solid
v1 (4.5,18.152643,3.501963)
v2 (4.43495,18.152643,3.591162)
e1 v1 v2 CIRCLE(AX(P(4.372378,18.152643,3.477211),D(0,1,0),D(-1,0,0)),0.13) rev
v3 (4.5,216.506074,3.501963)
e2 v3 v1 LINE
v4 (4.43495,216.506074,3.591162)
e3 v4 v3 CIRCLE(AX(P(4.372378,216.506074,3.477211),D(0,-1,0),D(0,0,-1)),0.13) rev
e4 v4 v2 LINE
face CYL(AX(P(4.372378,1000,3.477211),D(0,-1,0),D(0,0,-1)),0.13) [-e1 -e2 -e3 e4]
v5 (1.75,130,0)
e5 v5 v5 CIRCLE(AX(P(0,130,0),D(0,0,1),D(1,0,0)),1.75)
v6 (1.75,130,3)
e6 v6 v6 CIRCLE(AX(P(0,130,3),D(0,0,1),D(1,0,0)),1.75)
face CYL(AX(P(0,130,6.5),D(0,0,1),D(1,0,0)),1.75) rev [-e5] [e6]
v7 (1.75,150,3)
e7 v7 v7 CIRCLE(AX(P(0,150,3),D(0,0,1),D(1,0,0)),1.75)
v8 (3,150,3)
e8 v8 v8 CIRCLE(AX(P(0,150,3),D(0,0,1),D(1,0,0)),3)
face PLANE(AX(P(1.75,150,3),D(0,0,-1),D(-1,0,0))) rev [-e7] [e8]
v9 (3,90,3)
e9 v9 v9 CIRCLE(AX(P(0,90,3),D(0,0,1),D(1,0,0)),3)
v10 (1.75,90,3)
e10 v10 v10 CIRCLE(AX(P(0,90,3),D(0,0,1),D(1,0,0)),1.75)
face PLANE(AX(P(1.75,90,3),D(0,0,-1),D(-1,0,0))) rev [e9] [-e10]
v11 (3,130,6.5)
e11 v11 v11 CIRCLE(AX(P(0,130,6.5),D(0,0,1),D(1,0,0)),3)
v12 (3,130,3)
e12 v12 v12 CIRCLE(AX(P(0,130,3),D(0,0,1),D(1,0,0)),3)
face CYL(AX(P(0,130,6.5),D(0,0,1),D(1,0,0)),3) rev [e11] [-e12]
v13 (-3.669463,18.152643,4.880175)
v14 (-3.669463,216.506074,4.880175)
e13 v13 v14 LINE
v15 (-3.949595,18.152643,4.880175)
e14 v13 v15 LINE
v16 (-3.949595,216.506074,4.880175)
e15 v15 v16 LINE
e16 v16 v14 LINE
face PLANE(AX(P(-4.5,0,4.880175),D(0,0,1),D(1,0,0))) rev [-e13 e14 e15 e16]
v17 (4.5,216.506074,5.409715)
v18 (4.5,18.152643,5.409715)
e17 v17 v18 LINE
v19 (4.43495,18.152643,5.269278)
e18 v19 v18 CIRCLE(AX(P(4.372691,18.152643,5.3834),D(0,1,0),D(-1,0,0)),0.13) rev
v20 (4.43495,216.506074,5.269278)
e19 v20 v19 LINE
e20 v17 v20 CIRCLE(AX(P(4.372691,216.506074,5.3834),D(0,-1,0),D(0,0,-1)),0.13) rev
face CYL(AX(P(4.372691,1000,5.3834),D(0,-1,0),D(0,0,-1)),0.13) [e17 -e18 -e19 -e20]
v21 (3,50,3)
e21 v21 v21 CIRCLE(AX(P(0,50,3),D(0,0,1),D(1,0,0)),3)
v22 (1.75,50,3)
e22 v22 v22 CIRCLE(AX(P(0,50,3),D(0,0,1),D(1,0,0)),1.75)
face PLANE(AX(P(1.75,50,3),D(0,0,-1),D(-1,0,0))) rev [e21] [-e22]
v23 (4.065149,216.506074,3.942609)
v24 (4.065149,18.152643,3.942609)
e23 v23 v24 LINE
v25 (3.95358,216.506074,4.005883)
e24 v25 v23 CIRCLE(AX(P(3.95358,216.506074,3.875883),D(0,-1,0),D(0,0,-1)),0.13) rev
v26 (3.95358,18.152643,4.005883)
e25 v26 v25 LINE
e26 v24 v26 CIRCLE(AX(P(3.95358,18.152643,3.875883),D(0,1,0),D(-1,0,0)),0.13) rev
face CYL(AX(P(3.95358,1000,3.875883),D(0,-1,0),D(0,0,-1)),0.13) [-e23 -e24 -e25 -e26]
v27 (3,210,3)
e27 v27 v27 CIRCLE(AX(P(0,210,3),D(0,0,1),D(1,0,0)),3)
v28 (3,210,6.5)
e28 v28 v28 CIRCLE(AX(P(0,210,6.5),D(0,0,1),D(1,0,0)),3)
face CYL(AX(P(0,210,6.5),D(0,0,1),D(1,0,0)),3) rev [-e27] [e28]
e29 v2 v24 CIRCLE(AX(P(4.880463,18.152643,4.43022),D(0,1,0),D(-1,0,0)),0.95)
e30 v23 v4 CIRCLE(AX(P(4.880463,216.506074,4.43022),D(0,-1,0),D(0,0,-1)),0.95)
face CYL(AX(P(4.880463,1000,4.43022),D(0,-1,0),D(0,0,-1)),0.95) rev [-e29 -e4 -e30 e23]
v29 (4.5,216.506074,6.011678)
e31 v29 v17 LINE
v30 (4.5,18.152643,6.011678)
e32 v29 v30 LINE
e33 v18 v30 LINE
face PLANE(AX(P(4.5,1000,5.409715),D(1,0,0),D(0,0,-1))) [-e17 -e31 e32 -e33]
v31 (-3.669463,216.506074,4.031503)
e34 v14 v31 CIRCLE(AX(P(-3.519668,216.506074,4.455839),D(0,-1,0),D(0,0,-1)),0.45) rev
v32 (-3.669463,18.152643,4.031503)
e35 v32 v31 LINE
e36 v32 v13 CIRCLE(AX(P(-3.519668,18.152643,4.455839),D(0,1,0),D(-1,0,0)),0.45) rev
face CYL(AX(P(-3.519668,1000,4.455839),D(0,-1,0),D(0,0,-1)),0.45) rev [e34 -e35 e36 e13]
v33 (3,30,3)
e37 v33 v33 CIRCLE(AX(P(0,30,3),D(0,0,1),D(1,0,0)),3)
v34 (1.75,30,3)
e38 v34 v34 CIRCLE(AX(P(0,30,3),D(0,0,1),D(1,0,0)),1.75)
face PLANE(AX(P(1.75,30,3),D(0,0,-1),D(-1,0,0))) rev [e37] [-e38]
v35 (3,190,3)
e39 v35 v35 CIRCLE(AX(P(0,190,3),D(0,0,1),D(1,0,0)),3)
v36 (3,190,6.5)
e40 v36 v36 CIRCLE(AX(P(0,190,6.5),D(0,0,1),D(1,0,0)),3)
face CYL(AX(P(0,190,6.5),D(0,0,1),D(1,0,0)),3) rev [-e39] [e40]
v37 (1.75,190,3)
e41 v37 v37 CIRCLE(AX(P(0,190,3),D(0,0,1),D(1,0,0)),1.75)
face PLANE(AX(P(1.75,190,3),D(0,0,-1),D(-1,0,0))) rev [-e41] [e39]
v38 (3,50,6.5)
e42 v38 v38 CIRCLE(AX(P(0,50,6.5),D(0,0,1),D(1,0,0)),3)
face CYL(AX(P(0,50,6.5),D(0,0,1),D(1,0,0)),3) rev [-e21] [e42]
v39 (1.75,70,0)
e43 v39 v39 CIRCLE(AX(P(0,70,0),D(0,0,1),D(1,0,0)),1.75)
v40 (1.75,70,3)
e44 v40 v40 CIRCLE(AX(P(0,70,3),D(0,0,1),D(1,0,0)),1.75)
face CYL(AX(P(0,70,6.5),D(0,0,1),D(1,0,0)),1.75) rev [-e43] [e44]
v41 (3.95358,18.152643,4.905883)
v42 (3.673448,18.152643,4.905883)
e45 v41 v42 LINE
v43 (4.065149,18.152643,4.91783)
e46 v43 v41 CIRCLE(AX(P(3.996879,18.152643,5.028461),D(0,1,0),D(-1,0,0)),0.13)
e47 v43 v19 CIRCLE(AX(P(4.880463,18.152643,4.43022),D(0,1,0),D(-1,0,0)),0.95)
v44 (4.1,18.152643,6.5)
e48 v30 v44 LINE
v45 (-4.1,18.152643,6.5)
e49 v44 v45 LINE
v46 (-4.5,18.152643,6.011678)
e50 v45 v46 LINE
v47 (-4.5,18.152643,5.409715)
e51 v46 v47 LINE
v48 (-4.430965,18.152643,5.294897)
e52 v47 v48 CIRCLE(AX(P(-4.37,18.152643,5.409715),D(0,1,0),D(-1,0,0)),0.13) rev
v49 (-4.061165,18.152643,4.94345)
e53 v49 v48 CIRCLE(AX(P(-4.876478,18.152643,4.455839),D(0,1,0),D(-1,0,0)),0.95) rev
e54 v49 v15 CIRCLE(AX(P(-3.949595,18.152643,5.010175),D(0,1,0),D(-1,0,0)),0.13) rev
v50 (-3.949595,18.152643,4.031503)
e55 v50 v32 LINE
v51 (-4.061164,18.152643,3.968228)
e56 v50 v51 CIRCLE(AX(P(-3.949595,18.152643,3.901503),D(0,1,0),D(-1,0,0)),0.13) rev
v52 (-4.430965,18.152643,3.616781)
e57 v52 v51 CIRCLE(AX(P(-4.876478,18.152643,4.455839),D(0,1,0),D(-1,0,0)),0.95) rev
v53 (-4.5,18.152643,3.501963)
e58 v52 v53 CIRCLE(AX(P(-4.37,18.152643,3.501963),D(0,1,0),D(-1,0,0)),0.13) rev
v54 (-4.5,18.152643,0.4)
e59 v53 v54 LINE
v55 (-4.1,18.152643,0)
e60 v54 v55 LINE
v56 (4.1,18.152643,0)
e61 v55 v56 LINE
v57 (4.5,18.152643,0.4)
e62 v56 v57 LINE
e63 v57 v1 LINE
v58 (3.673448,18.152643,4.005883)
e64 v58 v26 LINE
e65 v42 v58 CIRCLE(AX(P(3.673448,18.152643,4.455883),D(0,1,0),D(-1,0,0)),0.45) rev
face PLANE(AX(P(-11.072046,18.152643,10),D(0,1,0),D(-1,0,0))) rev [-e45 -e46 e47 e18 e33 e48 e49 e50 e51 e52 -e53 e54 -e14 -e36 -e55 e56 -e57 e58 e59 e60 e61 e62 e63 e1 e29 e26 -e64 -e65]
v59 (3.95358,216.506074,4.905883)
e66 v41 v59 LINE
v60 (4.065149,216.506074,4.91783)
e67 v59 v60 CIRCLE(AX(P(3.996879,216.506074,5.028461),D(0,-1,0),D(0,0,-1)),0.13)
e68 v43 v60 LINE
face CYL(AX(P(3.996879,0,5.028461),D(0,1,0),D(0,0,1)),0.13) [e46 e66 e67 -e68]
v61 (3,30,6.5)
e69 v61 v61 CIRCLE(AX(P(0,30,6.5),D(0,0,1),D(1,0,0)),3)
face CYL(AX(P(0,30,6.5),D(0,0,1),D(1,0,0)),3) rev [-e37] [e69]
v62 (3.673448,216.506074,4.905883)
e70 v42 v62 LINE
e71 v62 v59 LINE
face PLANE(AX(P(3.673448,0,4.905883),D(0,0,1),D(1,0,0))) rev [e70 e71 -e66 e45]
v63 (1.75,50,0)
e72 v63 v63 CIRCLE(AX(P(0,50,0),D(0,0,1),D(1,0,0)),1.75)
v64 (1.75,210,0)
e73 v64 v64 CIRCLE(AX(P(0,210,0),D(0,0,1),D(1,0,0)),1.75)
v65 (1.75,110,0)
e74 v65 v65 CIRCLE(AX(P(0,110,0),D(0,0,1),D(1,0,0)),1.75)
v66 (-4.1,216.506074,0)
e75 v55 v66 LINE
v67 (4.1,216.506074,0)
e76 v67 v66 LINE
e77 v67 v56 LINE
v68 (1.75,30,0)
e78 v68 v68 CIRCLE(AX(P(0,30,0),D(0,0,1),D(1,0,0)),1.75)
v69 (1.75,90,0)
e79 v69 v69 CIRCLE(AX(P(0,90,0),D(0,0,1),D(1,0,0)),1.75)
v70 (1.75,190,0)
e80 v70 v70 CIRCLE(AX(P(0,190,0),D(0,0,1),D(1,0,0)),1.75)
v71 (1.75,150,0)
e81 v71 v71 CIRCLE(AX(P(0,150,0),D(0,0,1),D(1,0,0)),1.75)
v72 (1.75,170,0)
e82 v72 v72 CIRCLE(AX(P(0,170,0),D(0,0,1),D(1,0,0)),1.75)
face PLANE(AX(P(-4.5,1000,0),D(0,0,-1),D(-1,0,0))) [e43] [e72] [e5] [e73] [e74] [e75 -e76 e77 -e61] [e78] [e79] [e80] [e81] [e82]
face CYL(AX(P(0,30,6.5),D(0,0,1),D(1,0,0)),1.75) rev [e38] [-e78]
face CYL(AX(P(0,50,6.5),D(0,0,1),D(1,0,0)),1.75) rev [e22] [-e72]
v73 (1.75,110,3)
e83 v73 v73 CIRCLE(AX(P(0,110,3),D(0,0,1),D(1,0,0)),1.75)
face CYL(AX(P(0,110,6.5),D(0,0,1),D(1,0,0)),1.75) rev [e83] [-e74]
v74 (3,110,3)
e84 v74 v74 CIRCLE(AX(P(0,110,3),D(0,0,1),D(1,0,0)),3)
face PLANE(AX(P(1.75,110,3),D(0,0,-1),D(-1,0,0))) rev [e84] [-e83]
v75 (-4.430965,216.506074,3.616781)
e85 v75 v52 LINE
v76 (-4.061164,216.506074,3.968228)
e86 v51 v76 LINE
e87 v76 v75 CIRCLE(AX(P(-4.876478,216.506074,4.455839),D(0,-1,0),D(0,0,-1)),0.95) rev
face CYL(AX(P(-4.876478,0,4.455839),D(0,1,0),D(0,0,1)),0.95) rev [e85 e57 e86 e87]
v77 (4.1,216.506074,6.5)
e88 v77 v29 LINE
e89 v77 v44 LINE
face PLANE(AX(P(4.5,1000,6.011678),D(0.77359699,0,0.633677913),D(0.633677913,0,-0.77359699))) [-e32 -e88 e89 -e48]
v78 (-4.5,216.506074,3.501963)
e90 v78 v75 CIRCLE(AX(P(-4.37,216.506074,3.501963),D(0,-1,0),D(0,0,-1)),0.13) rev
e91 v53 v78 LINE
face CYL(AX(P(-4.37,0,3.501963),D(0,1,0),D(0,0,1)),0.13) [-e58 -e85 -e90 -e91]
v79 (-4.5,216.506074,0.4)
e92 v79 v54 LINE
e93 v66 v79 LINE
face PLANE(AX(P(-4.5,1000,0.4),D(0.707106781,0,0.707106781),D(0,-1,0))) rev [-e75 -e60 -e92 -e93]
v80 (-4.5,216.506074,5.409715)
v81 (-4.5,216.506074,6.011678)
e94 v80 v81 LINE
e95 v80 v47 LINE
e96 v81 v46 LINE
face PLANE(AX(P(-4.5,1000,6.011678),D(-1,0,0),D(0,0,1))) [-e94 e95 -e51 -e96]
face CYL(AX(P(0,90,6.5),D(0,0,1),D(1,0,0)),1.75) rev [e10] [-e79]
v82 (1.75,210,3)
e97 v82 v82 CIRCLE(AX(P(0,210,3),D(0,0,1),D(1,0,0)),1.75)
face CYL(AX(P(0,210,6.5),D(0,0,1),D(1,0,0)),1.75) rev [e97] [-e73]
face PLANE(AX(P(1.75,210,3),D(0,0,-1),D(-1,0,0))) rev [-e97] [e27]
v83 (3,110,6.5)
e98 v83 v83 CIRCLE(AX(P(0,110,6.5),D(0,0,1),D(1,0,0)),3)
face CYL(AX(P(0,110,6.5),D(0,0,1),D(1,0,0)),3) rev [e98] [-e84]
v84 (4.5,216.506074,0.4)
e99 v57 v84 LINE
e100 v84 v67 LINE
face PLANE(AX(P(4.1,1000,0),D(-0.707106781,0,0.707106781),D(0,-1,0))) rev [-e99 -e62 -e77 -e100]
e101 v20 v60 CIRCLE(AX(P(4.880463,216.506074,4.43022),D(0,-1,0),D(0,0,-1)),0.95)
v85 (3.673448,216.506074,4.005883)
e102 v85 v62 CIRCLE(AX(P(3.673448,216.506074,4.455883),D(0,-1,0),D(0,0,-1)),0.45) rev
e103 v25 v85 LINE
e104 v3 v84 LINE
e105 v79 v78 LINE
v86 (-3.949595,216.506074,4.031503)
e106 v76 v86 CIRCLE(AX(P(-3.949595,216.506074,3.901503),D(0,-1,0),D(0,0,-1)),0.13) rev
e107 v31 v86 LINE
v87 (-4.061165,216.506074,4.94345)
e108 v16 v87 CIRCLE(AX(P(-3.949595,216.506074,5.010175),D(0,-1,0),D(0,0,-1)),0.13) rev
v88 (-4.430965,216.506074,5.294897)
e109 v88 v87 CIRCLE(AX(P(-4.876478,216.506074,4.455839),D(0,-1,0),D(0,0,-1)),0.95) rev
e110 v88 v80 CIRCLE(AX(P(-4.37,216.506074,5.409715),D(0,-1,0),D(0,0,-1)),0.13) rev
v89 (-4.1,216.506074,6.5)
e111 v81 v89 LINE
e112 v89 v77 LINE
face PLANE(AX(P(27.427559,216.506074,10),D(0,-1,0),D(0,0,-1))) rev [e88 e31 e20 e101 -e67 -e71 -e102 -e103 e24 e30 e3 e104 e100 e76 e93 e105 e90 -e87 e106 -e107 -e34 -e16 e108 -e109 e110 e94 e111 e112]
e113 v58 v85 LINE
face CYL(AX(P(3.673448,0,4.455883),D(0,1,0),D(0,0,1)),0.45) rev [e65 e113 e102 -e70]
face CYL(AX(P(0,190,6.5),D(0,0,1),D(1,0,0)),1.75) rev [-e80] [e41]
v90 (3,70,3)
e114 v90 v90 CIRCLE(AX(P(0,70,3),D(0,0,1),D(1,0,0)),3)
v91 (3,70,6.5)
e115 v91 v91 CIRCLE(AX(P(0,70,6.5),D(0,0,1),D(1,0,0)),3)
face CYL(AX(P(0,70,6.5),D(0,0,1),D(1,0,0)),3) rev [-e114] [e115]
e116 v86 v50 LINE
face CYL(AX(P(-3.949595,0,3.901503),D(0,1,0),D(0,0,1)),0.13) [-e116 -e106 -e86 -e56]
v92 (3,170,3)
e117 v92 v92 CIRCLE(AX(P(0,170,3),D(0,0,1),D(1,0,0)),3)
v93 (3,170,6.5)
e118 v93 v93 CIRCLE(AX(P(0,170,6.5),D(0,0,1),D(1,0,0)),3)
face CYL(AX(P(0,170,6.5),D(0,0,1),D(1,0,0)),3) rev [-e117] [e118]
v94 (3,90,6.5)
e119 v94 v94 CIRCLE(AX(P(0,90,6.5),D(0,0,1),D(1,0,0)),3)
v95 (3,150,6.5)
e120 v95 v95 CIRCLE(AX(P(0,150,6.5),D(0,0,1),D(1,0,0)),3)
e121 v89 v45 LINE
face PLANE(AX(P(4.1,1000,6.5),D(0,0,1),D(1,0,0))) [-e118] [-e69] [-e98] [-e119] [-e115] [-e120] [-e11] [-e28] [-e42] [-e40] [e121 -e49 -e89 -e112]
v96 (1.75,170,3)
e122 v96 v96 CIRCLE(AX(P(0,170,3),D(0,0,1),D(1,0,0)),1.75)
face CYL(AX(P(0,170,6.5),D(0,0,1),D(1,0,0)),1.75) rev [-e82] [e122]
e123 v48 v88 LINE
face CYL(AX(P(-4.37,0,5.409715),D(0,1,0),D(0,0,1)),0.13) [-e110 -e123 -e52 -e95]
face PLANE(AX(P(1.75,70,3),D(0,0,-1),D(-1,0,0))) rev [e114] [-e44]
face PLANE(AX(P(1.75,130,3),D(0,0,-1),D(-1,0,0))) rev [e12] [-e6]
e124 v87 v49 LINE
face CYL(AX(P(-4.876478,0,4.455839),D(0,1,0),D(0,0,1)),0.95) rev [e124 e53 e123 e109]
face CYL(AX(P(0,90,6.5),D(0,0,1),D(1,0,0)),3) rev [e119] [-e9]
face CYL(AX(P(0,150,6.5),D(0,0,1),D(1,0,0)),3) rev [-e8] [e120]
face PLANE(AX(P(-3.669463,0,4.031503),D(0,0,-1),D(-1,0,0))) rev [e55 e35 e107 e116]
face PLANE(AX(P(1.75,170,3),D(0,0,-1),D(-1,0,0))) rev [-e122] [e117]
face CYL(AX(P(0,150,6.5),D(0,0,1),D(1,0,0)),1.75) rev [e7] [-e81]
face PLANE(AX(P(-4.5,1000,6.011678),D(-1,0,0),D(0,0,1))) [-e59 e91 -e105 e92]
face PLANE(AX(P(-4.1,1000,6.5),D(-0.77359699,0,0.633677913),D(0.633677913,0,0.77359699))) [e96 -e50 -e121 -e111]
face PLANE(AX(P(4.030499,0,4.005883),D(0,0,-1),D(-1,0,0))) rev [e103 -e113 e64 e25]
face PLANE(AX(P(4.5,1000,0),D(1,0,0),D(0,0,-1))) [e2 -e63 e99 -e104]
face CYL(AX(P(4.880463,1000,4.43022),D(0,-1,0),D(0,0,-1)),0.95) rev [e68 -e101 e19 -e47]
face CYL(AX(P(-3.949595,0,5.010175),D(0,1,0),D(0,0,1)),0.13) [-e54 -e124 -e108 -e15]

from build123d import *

# Parameters (mm, degrees)
RESSALTO_EXTRUS_O1_DEPTH                             = 1000
CORTE_EXTRUS_O1_START                                = -1000
CORTE_EXTRUS_O1_DEPTH                                = 1000
CORTE_EXTRUS_O2_DEPTH                                = 1001.031261626
CORTE_EXTRUS_O3_DEPTH                                = 1001.031261626
CORTE_EXTRUS_O4_DEPTH                                = 1001.031261626
CORTE_EXTRUS_O5_DEPTH                                = 0.002166667
CORTE_EXTRUS_O6_DEPTH                                = 0.002166667
CORTE_EXTRUS_O7_DEPTH                                = 0.002166667
CORTE_EXTRUS_O8_DEPTH                                = 0.002166667
INCLINA_O1_ANGLE                                     = 45.1469538
ESBO_O10_W                                           = 0.450000001
ESBO_O10_H                                           = 1000
REBAIXO_PARA_PARAFUSO_DE_M_QUINA_DE_CABE_D           = 3.5
REBAIXO_PARA_PARAFUSO_DE_M_QUINA_DE_CABE_CBORE_D     = 6
REBAIXO_PARA_PARAFUSO_DE_M_QUINA_DE_CABE_CBORE_DEPTH = 3.50000002
CHANFRO1_SIZE                                        = 0.062563219
CHANFRO1_SIZE2                                       = 0.062205617
CHANFRO3_START                                       = -3.730761794
CHANFRO3_DEPTH                                       = 0.399013115
CHANFRO4_SIZE                                        = 0.4
FILETE1_R                                            = 0.130000023
SKETCH1_W                                            = 36.072768502
SKETCH1_H                                            = 801.847062841
SKETCH1_W_2                                          = 21.632087489
SKETCH1_H_2                                          = 62.411000867
CUT_EXTRUDE1_DEPTH                                   = 10


with BuildPart() as part:
    # Esboço1 → Ressalto-extrusão1 (new body)
    with BuildSketch(Plane.XZ):
        with BuildLine():
            Line((4.5, 5.4097155), (4.5, 6.01167813))
            Line((4.5, 6.01167813), (4.1, 6.50000002))
            Line((4.1, 6.50000002), (-4.1, 6.50000002))
            Line((-4.1, 6.50000002), (-4.5, 6.01167813))
            Line((-4.5, 6.01167813), (-4.5, 2e-08))
            Line((-4.5, 2e-08), (4.5, 2e-08))
            Line((4.5, 2e-08), (4.5, 3.50196265))
            ThreePointArc((4.5, 3.50196265), (4.477413879, 3.553810372), (4.43494978, 3.59116167))
            ThreePointArc((4.43494978, 3.59116167), (3.930462682, 4.43021964), (4.43494978, 5.26927761))
            ThreePointArc((4.43494978, 5.26927761), (4.490651601, 5.328761203), (4.5, 5.4097155))
        make_face()
    extrude(amount=-RESSALTO_EXTRUS_O1_DEPTH)

    # Esboço2 → Corte-extrusão1 (cut)
    with BuildSketch(Plane(origin=(0, 1000, 0), x_dir=(-1, 0, 0), z_dir=(0, 1, 0)).offset(CORTE_EXTRUS_O1_START)):
        with BuildLine():
            Line((-4.030498711, 4.00588336), (-3.673447948, 4.00588336))
            ThreePointArc((-3.673447948, 4.00588336), (-3.223447946, 4.455883362), (-3.673447948, 4.905883363))
            Line((-3.673447948, 4.905883363), (-3.953580008, 4.905883363))
            ThreePointArc((-3.953580008, 4.905883363), (-4.010719931, 4.899199784), (-4.065149208, 4.917830263))
            ThreePointArc((-4.065149208, 4.917830263), (-3.93114763, 4.466290066), (-4.030498711, 4.00588336))
        make_face()
    extrude(amount=CORTE_EXTRUS_O1_DEPTH, mode=Mode.SUBTRACT)

    # Esboço3 → Corte-extrusão2 (cut, through all)
    with BuildSketch(Plane(origin=(0, 1000, 0), x_dir=(-1, 0, 0), z_dir=(0, 1, 0))):
        with BuildLine():
            Line((4.5, 4.03150278), (4.5, 4.88017535))
            Line((4.5, 4.88017535), (3.66946318, 4.88017535))
            ThreePointArc((3.66946318, 4.88017535), (3.969667593, 4.455839065), (3.66946318, 4.03150278))
            Line((3.66946318, 4.03150278), (4.5, 4.03150278))
        make_face()
    extrude(amount=-CORTE_EXTRUS_O2_DEPTH, mode=Mode.SUBTRACT)

    # Esboço4 → Corte-extrusão3 (cut, through all)
    with BuildSketch(Plane(origin=(0, 1000, 0), x_dir=(-1, 0, 0), z_dir=(0, 1, 0))):
        with BuildLine():
            Line((4.026513974, 4.88017535), (4.5, 4.88017535))
            Line((4.5, 4.88017535), (4.5, 5.328056964))
            ThreePointArc((4.5, 5.328056964), (4.223646078, 5.145991535), (4.026513974, 4.88017535))
        make_face()
    extrude(amount=-CORTE_EXTRUS_O3_DEPTH, mode=Mode.SUBTRACT)

    # Esboço5 → Corte-extrusão4 (cut, through all)
    with BuildSketch(Plane(origin=(0, 1000, 0), x_dir=(-1, 0, 0), z_dir=(0, 1, 0))):
        with BuildLine():
            Line((4.5, 3.583620931), (4.5, 4.03150278))
            Line((4.5, 4.03150278), (4.026513856, 4.03150278))
            ThreePointArc((4.026513856, 4.03150278), (4.223645982, 3.76568645), (4.5, 3.583620931))
        make_face()
    extrude(amount=-CORTE_EXTRUS_O4_DEPTH, mode=Mode.SUBTRACT)

    # Esboço6 → Corte-extrusão5 (cut)
    with BuildSketch(Plane(origin=(0, 1000, 0), x_dir=(-1, 0, 0), z_dir=(0, 1, 0))):
        Polygon((0.891369267, 3.403698133), (0.714701433, 3.168235633), (0.2187042, 2.61105), (1.0945792, 2.61105), (1.0945792, 2.695983333), (0.398689633, 2.695983333), (0.794326433, 3.149466667), (0.9743123, 3.3891), (1.067110588, 3.573407857), (0.95413722, 3.802321701), (0.7876908, 3.88505), (0.54301, 3.88505), (0.375434678, 3.803592619), (0.295011167, 3.6384023), (0.295011167, 3.562), (0.3812718, 3.562), (0.3812718, 3.631766667), (0.437672733, 3.743620833), (0.549645633, 3.800116667), (0.7802262, 3.800116667), (0.893028067, 3.743810633), (0.976240026, 3.576039029), align=None)
    extrude(amount=-CORTE_EXTRUS_O5_DEPTH, mode=Mode.SUBTRACT)

    # Esboço7 → Corte-extrusão6 (cut)
    with BuildSketch(Plane.XZ):
        Polygon((-0.214632167, 3.88505), (-0.953983333, 3.88505), (-0.953983333, 2.61105), (-0.214632167, 2.61105), (-0.214632167, 2.695983333), (-0.86905, 2.695983333), (-0.86905, 3.205583333), (-0.5123963, 3.205583333), (-0.5123963, 3.290516667), (-0.86905, 3.290516667), (-0.86905, 3.800116667), (-0.214632167, 3.800116667), align=None)
    extrude(amount=-CORTE_EXTRUS_O6_DEPTH, mode=Mode.SUBTRACT)

    # Esboço8 → Corte-extrusão7 (cut)
    with BuildSketch(Plane(origin=(0, 1000, 0), x_dir=(-1, 0, 0), z_dir=(0, 1, 0))):
        Polygon((-0.214632167, 3.88505), (-0.953983333, 3.88505), (-0.953983333, 2.61105), (-0.214632167, 2.61105), (-0.214632167, 2.695983333), (-0.86905, 2.695983333), (-0.86905, 3.205583333), (-0.5123963, 3.205583333), (-0.5123963, 3.290516667), (-0.86905, 3.290516667), (-0.86905, 3.800116667), (-0.214632167, 3.800116667), align=None)
    extrude(amount=-CORTE_EXTRUS_O7_DEPTH, mode=Mode.SUBTRACT)

    # Esboço9 → Corte-extrusão8 (cut)
    with BuildSketch(Plane.XZ):
        Polygon((0.510057167, 3.620830633), (0.6071, 3.718655633), (0.6071, 2.609403333), (0.692033333, 2.609403333), (0.692033333, 3.883403333), (0.6741176, 3.883403333), (0.6741176, 3.795069794), (0.3690544, 3.640736667), (0.3690544, 3.551253333), align=None)
    extrude(amount=-CORTE_EXTRUS_O8_DEPTH, mode=Mode.SUBTRACT)

    # Inclinação1
    inclina_o1_faces = [part.faces().sort_by_distance(p)[0] for p in [
        (0.6741176, 0.001083333, 3.839236564),
    ]]
    draft(inclina_o1_faces, Plane(origin=(0.692033333, 0.002166667, 3.883403333), x_dir=(-1, 0, 0), z_dir=(0, 0, -1)), INCLINA_O1_ANGLE)

    # Esboço10 → Corte-Revolução1 (revolve, cut)
    with BuildSketch(Plane.XY.offset(4.455839065)):
        with Locations((-3.294667591, 500)):
            Rectangle(ESBO_O10_W, ESBO_O10_H)
    revolve(axis=Axis((-3.519667591, 1000, 4.455839065), (0, -1, 0)), mode=Mode.SUBTRACT)

    # Rebaixo para parafuso de máquina de cabeça sextavada de M31 (through all)
    with Locations(Plane.XY.offset(6.50000002)):
        with Locations((0, 990), (0, 970), (0, 950), (0, 930), (0, 910), (0, 890), (0, 870), (0, 850), (0, 830), (0, 810), (0, 790), (0, 770), (0, 750), (0, 730), (0, 710), (0, 690), (0, 670), (0, 650), (0, 630), (0, 610), (0, 590), (0, 570), (0, 550), (0, 530), (0, 510), (0, 490), (0, 470), (0, 450), (0, 430), (0, 410), (0, 390), (0, 370), (0, 350), (0, 330), (0, 310), (0, 290), (0, 270), (0, 250), (0, 230), (0, 210), (0, 190), (0, 170), (0, 150), (0, 130), (0, 110), (0, 90), (0, 70), (0, 50), (0, 30), (0, 10)):
            CounterBoreHole(REBAIXO_PARA_PARAFUSO_DE_M_QUINA_DE_CABE_D / 2, REBAIXO_PARA_PARAFUSO_DE_M_QUINA_DE_CABE_CBORE_D / 2, REBAIXO_PARA_PARAFUSO_DE_M_QUINA_DE_CABE_CBORE_DEPTH)

    # Chanfro1
    chanfro1_edges = [part.edges().sort_by_distance(p)[0] for p in [
        (-0.976240026, 999.998916667, 3.576039029),
    ]]
    chanfro1_side = [part.faces().sort_by_distance(p)[0] for p in [
        (-0.933804646, 999.998916667, 3.489868581),
    ]]
    chamfer(chanfro1_edges, length=CHANFRO1_SIZE, length2=CHANFRO1_SIZE2, reference=chanfro1_side[0])

    # Chanfro3: read off the stored shape, not the designer's step
    # Chanfro3 outline → Chanfro3 (add)
    with BuildSketch(Plane(origin=(0, 0, 0), x_dir=(0.8991051825477068, 0, 0.43773264753254887), z_dir=(0.4377326475325489, 0, -0.8991051825477069)).offset(CHANFRO3_START)):
        Polygon((1.327401403, -999.997833333), (1.31122788, -999.997833333), (1.311999664, -1000), (1.327401403, -1000), align=None)
    extrude(amount=CHANFRO3_DEPTH)

    # Chanfro4
    chanfro4_edges = [part.edges().sort_by_distance(p)[0] for p in [
        (4.5, 500, 2e-08),
        (-4.5, 500, 2e-08),
    ]]
    chamfer(chanfro4_edges, length=CHANFRO4_SIZE)

    # Filete1
    filete1_edges = [part.edges().sort_by_distance(p)[0] for p in [
        (4.030498711, 500, 4.00588336),
        (-4.026513974, 500, 4.88017535),
        (-4.5, 500, 5.328056964),
        (-4.5, 500, 3.583620931),
        (-4.026513856, 500, 4.03150278),
    ]]
    fillet(filete1_edges, radius=FILETE1_R)

    # Sketch1 → Cut-Extrude1 (cut)
    with BuildSketch(Plane(origin=(0, 0, 0), x_dir=(-1, 0, 0), z_dir=(0, 0, -1))):
        with Locations((-9.39117436, 617.429605919)):
            Rectangle(SKETCH1_W, SKETCH1_H)
        with Locations((0.25600221, -13.052857141)):
            Rectangle(SKETCH1_W_2, SKETCH1_H_2)
    extrude(amount=-CUT_EXTRUDE1_DEPTH, mode=Mode.SUBTRACT)


solid = part.part
